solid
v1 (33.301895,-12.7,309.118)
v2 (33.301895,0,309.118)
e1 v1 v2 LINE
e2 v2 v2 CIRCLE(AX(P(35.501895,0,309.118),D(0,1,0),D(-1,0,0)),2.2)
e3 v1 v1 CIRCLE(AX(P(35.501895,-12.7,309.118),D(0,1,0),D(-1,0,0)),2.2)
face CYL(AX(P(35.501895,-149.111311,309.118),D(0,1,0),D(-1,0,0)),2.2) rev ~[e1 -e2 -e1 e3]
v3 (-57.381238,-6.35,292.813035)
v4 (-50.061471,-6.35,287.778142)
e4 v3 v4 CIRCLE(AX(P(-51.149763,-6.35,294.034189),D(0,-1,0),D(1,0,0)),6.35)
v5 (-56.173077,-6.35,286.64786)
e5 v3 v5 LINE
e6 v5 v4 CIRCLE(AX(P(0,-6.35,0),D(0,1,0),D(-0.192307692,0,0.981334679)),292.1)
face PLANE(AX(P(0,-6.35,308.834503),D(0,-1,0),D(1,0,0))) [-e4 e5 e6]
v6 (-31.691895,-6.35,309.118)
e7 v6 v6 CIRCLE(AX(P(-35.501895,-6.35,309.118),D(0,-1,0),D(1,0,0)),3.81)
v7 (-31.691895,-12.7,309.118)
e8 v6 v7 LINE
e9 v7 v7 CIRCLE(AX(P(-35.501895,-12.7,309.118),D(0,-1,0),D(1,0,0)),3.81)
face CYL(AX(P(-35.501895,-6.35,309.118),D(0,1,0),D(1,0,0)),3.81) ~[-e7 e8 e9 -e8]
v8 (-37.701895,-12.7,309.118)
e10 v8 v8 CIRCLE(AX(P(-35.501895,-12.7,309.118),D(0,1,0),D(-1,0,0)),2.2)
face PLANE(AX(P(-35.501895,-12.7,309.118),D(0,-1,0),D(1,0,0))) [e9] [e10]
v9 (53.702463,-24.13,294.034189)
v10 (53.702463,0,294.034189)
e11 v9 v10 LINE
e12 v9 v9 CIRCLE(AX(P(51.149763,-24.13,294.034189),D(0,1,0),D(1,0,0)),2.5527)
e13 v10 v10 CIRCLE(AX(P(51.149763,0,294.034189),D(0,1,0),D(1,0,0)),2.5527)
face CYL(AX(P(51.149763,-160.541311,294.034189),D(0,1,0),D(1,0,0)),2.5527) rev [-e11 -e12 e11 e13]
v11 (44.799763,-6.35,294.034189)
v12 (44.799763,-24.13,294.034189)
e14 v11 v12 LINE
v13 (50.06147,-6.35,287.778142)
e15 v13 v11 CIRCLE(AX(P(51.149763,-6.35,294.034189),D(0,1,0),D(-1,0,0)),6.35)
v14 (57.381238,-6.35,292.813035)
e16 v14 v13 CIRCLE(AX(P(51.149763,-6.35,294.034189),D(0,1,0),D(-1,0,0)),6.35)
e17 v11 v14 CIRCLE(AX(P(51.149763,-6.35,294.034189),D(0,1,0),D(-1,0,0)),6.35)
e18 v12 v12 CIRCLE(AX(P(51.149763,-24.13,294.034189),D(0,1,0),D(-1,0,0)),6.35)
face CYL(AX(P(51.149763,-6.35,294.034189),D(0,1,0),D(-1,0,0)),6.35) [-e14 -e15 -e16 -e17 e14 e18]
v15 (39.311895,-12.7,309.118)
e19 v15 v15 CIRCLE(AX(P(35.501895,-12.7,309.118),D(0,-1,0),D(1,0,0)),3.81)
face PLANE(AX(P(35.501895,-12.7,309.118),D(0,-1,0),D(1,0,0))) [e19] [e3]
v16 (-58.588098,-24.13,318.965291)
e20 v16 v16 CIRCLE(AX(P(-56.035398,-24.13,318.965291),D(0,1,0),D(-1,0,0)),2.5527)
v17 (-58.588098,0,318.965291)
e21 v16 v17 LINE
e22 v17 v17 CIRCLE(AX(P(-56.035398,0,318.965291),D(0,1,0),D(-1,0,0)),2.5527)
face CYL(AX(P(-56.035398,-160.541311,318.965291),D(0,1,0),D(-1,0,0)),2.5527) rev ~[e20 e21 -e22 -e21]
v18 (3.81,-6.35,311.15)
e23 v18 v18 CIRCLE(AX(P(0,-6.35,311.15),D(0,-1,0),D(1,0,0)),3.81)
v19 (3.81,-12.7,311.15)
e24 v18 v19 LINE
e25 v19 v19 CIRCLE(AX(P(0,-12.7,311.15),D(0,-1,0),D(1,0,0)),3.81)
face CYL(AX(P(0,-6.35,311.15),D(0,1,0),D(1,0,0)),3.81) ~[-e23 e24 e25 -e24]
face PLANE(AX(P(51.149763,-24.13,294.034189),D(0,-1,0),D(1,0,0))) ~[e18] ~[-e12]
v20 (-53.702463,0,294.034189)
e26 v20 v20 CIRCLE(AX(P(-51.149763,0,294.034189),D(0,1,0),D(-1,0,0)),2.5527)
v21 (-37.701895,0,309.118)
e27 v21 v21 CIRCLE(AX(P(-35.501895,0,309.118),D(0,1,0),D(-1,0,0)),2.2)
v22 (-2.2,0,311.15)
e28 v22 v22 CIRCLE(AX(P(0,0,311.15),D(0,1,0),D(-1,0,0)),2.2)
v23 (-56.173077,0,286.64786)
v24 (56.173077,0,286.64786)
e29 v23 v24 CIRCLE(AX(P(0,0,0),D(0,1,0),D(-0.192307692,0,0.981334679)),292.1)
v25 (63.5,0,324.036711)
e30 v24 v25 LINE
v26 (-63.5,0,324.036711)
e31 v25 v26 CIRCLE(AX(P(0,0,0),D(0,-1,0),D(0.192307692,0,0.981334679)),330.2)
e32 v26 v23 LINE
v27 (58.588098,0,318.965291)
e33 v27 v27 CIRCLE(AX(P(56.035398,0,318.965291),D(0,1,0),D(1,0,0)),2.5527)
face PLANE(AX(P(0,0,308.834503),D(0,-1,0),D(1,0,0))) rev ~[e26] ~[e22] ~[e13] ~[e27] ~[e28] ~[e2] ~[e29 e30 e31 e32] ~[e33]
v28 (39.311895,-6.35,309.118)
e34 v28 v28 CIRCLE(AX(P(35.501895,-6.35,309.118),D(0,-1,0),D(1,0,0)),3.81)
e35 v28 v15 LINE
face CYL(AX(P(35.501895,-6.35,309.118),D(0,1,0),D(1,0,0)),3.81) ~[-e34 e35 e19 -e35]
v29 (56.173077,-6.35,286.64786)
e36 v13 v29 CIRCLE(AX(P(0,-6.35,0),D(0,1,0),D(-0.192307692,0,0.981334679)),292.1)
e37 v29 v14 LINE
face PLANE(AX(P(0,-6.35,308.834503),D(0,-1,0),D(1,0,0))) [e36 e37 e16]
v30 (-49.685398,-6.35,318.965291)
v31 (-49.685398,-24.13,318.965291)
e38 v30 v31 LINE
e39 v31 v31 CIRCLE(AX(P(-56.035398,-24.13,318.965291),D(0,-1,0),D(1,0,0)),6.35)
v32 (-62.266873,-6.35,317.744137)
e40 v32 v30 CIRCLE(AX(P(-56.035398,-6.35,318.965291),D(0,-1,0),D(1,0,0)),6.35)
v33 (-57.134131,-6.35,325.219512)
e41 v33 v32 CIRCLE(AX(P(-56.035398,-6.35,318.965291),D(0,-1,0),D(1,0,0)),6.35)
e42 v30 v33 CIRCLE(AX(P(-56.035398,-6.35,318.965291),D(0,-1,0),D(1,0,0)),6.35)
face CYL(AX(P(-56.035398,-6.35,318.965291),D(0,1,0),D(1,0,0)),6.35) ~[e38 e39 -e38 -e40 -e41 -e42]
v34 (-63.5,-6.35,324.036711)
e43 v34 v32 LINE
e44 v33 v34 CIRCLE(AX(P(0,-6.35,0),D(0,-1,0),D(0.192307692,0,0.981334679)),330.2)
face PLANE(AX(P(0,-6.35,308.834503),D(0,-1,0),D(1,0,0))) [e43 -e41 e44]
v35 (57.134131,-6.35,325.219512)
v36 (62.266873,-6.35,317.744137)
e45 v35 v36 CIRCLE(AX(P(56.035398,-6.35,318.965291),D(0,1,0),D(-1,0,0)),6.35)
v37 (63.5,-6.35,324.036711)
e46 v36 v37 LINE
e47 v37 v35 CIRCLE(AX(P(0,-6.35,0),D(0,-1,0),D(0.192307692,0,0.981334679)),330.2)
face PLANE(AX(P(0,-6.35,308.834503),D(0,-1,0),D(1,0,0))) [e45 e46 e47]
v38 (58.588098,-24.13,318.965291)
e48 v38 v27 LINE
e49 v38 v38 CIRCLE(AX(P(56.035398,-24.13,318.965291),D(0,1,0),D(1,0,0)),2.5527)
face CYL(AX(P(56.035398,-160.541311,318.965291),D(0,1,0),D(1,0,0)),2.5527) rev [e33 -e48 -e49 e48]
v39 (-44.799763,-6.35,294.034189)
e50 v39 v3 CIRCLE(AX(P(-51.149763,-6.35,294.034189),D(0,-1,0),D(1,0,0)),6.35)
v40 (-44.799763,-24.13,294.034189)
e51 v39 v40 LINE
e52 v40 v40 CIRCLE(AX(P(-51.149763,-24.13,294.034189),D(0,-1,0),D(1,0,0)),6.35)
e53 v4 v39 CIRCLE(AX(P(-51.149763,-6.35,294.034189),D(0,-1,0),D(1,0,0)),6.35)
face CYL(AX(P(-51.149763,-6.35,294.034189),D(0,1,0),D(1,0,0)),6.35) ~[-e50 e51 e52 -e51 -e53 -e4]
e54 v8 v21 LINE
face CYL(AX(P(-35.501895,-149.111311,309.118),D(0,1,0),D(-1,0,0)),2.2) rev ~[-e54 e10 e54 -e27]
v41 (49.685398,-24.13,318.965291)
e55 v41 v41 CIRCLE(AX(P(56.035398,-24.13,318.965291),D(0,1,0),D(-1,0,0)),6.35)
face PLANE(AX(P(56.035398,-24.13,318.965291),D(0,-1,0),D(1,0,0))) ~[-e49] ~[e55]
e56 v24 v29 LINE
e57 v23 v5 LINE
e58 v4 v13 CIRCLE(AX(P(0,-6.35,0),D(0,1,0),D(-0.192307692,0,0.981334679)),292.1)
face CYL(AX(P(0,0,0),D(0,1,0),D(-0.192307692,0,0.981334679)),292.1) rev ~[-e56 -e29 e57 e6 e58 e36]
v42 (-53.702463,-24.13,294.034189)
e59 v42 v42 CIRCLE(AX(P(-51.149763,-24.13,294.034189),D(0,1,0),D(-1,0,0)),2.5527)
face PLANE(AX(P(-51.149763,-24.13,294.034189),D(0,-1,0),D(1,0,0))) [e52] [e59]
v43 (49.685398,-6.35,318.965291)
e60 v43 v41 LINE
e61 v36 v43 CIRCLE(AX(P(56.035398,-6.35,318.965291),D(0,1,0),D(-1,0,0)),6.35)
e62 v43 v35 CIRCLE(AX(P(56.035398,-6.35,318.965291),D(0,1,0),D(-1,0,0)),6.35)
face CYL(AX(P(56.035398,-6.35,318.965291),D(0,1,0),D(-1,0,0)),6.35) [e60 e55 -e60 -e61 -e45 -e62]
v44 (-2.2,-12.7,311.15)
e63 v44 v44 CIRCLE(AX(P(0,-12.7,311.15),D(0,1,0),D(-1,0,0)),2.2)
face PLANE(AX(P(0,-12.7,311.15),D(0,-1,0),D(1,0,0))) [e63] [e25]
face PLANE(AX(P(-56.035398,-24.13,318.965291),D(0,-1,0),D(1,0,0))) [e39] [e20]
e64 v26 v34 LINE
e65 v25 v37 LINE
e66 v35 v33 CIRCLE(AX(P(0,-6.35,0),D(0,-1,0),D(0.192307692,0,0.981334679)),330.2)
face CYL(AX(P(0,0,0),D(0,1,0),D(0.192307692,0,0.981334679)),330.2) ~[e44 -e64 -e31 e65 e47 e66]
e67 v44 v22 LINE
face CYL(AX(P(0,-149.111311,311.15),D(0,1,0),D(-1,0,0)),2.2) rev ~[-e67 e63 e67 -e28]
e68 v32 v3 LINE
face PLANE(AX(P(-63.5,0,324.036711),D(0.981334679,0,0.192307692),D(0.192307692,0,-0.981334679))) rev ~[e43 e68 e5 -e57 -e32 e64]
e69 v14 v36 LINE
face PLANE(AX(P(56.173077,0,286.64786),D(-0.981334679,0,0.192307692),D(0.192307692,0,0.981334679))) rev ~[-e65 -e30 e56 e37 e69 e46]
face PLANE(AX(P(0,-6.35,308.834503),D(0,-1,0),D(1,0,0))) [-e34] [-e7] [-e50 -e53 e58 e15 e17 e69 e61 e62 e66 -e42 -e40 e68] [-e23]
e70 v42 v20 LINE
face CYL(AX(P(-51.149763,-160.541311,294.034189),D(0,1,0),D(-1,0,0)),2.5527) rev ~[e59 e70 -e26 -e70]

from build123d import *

# Parameters (mm, degrees)
F1_DEPTH = 6.35
F2_R     = 6.35
F3_DEPTH = 17.78
F5_D     = 5.1054
F6_R     = 3.81
F7_DEPTH = 6.35
F9_D     = 4.4


# Not quite as in the source:
# - a pattern or mirror of a feature is missing from the dataset's text; its kind, count and spacing are read off the source's solid


with BuildPart() as f1:
    # F0 (on Front) → F1 (new body)
    with BuildSketch(Plane.XZ):
        with BuildLine():
            Line((56.1730769231, 286.6478596274), (63.5, 324.0367108832))
            ThreePointArc((63.5, 324.0367108832), (0, 330.2), (-63.5, 324.0367108832))
            Line((-63.5, 324.0367108832), (-56.1730769231, 286.6478596274))
            ThreePointArc((-56.1730769231, 286.6478596274), (0, 292.1), (56.1730769231, 286.6478596274))
        make_face()
    extrude(amount=F1_DEPTH)

    # F2 (on face) → F3 (join)
    with BuildSketch(Plane.XZ.offset(6.35)):
        with Locations((-51.149763091, 294.0341888892)):
            Circle(F2_R)
        with Locations((-56.0353976971, 318.9652907527)):
            Circle(F2_R)
    f3 = extrude(amount=F3_DEPTH)

    # F3_copies: F3 across plane
    add(f3.mirror(Plane(origin=(0, 0, 0), x_dir=(0, 0, 1), z_dir=(1, 0, 0))))

    # F5 (through all)
    with Locations(Plane.XZ.offset(24.13)):
        with Locations((-56.0353976971, 318.9652907527), (-51.149763091, 294.0341888892)):
            f5 = Hole(F5_D / 2)

    # F5_copies: F5 across plane
    add(f5.mirror(Plane(origin=(0, 0, 0), x_dir=(0, 0, 1), z_dir=(1, 0, 0))), mode=Mode.SUBTRACT)

    # F6 (on face) → F7 (join)
    with BuildSketch(Plane.XZ.offset(6.35)):
        with Locations((0, 311.15)):
            Circle(F6_R)
        with Locations((-35.501895386, 309.118)):
            Circle(F6_R)
        with Locations((35.501895386, 309.118)):
            Circle(F6_R)
    extrude(amount=F7_DEPTH)

    # F9 (through all)
    with Locations(Plane.XZ.offset(12.7)):
        with Locations((-35.501895386, 309.118), (0, 311.15), (35.501895386, 309.118)):
            Hole(F9_D / 2)


solid = f1.part
